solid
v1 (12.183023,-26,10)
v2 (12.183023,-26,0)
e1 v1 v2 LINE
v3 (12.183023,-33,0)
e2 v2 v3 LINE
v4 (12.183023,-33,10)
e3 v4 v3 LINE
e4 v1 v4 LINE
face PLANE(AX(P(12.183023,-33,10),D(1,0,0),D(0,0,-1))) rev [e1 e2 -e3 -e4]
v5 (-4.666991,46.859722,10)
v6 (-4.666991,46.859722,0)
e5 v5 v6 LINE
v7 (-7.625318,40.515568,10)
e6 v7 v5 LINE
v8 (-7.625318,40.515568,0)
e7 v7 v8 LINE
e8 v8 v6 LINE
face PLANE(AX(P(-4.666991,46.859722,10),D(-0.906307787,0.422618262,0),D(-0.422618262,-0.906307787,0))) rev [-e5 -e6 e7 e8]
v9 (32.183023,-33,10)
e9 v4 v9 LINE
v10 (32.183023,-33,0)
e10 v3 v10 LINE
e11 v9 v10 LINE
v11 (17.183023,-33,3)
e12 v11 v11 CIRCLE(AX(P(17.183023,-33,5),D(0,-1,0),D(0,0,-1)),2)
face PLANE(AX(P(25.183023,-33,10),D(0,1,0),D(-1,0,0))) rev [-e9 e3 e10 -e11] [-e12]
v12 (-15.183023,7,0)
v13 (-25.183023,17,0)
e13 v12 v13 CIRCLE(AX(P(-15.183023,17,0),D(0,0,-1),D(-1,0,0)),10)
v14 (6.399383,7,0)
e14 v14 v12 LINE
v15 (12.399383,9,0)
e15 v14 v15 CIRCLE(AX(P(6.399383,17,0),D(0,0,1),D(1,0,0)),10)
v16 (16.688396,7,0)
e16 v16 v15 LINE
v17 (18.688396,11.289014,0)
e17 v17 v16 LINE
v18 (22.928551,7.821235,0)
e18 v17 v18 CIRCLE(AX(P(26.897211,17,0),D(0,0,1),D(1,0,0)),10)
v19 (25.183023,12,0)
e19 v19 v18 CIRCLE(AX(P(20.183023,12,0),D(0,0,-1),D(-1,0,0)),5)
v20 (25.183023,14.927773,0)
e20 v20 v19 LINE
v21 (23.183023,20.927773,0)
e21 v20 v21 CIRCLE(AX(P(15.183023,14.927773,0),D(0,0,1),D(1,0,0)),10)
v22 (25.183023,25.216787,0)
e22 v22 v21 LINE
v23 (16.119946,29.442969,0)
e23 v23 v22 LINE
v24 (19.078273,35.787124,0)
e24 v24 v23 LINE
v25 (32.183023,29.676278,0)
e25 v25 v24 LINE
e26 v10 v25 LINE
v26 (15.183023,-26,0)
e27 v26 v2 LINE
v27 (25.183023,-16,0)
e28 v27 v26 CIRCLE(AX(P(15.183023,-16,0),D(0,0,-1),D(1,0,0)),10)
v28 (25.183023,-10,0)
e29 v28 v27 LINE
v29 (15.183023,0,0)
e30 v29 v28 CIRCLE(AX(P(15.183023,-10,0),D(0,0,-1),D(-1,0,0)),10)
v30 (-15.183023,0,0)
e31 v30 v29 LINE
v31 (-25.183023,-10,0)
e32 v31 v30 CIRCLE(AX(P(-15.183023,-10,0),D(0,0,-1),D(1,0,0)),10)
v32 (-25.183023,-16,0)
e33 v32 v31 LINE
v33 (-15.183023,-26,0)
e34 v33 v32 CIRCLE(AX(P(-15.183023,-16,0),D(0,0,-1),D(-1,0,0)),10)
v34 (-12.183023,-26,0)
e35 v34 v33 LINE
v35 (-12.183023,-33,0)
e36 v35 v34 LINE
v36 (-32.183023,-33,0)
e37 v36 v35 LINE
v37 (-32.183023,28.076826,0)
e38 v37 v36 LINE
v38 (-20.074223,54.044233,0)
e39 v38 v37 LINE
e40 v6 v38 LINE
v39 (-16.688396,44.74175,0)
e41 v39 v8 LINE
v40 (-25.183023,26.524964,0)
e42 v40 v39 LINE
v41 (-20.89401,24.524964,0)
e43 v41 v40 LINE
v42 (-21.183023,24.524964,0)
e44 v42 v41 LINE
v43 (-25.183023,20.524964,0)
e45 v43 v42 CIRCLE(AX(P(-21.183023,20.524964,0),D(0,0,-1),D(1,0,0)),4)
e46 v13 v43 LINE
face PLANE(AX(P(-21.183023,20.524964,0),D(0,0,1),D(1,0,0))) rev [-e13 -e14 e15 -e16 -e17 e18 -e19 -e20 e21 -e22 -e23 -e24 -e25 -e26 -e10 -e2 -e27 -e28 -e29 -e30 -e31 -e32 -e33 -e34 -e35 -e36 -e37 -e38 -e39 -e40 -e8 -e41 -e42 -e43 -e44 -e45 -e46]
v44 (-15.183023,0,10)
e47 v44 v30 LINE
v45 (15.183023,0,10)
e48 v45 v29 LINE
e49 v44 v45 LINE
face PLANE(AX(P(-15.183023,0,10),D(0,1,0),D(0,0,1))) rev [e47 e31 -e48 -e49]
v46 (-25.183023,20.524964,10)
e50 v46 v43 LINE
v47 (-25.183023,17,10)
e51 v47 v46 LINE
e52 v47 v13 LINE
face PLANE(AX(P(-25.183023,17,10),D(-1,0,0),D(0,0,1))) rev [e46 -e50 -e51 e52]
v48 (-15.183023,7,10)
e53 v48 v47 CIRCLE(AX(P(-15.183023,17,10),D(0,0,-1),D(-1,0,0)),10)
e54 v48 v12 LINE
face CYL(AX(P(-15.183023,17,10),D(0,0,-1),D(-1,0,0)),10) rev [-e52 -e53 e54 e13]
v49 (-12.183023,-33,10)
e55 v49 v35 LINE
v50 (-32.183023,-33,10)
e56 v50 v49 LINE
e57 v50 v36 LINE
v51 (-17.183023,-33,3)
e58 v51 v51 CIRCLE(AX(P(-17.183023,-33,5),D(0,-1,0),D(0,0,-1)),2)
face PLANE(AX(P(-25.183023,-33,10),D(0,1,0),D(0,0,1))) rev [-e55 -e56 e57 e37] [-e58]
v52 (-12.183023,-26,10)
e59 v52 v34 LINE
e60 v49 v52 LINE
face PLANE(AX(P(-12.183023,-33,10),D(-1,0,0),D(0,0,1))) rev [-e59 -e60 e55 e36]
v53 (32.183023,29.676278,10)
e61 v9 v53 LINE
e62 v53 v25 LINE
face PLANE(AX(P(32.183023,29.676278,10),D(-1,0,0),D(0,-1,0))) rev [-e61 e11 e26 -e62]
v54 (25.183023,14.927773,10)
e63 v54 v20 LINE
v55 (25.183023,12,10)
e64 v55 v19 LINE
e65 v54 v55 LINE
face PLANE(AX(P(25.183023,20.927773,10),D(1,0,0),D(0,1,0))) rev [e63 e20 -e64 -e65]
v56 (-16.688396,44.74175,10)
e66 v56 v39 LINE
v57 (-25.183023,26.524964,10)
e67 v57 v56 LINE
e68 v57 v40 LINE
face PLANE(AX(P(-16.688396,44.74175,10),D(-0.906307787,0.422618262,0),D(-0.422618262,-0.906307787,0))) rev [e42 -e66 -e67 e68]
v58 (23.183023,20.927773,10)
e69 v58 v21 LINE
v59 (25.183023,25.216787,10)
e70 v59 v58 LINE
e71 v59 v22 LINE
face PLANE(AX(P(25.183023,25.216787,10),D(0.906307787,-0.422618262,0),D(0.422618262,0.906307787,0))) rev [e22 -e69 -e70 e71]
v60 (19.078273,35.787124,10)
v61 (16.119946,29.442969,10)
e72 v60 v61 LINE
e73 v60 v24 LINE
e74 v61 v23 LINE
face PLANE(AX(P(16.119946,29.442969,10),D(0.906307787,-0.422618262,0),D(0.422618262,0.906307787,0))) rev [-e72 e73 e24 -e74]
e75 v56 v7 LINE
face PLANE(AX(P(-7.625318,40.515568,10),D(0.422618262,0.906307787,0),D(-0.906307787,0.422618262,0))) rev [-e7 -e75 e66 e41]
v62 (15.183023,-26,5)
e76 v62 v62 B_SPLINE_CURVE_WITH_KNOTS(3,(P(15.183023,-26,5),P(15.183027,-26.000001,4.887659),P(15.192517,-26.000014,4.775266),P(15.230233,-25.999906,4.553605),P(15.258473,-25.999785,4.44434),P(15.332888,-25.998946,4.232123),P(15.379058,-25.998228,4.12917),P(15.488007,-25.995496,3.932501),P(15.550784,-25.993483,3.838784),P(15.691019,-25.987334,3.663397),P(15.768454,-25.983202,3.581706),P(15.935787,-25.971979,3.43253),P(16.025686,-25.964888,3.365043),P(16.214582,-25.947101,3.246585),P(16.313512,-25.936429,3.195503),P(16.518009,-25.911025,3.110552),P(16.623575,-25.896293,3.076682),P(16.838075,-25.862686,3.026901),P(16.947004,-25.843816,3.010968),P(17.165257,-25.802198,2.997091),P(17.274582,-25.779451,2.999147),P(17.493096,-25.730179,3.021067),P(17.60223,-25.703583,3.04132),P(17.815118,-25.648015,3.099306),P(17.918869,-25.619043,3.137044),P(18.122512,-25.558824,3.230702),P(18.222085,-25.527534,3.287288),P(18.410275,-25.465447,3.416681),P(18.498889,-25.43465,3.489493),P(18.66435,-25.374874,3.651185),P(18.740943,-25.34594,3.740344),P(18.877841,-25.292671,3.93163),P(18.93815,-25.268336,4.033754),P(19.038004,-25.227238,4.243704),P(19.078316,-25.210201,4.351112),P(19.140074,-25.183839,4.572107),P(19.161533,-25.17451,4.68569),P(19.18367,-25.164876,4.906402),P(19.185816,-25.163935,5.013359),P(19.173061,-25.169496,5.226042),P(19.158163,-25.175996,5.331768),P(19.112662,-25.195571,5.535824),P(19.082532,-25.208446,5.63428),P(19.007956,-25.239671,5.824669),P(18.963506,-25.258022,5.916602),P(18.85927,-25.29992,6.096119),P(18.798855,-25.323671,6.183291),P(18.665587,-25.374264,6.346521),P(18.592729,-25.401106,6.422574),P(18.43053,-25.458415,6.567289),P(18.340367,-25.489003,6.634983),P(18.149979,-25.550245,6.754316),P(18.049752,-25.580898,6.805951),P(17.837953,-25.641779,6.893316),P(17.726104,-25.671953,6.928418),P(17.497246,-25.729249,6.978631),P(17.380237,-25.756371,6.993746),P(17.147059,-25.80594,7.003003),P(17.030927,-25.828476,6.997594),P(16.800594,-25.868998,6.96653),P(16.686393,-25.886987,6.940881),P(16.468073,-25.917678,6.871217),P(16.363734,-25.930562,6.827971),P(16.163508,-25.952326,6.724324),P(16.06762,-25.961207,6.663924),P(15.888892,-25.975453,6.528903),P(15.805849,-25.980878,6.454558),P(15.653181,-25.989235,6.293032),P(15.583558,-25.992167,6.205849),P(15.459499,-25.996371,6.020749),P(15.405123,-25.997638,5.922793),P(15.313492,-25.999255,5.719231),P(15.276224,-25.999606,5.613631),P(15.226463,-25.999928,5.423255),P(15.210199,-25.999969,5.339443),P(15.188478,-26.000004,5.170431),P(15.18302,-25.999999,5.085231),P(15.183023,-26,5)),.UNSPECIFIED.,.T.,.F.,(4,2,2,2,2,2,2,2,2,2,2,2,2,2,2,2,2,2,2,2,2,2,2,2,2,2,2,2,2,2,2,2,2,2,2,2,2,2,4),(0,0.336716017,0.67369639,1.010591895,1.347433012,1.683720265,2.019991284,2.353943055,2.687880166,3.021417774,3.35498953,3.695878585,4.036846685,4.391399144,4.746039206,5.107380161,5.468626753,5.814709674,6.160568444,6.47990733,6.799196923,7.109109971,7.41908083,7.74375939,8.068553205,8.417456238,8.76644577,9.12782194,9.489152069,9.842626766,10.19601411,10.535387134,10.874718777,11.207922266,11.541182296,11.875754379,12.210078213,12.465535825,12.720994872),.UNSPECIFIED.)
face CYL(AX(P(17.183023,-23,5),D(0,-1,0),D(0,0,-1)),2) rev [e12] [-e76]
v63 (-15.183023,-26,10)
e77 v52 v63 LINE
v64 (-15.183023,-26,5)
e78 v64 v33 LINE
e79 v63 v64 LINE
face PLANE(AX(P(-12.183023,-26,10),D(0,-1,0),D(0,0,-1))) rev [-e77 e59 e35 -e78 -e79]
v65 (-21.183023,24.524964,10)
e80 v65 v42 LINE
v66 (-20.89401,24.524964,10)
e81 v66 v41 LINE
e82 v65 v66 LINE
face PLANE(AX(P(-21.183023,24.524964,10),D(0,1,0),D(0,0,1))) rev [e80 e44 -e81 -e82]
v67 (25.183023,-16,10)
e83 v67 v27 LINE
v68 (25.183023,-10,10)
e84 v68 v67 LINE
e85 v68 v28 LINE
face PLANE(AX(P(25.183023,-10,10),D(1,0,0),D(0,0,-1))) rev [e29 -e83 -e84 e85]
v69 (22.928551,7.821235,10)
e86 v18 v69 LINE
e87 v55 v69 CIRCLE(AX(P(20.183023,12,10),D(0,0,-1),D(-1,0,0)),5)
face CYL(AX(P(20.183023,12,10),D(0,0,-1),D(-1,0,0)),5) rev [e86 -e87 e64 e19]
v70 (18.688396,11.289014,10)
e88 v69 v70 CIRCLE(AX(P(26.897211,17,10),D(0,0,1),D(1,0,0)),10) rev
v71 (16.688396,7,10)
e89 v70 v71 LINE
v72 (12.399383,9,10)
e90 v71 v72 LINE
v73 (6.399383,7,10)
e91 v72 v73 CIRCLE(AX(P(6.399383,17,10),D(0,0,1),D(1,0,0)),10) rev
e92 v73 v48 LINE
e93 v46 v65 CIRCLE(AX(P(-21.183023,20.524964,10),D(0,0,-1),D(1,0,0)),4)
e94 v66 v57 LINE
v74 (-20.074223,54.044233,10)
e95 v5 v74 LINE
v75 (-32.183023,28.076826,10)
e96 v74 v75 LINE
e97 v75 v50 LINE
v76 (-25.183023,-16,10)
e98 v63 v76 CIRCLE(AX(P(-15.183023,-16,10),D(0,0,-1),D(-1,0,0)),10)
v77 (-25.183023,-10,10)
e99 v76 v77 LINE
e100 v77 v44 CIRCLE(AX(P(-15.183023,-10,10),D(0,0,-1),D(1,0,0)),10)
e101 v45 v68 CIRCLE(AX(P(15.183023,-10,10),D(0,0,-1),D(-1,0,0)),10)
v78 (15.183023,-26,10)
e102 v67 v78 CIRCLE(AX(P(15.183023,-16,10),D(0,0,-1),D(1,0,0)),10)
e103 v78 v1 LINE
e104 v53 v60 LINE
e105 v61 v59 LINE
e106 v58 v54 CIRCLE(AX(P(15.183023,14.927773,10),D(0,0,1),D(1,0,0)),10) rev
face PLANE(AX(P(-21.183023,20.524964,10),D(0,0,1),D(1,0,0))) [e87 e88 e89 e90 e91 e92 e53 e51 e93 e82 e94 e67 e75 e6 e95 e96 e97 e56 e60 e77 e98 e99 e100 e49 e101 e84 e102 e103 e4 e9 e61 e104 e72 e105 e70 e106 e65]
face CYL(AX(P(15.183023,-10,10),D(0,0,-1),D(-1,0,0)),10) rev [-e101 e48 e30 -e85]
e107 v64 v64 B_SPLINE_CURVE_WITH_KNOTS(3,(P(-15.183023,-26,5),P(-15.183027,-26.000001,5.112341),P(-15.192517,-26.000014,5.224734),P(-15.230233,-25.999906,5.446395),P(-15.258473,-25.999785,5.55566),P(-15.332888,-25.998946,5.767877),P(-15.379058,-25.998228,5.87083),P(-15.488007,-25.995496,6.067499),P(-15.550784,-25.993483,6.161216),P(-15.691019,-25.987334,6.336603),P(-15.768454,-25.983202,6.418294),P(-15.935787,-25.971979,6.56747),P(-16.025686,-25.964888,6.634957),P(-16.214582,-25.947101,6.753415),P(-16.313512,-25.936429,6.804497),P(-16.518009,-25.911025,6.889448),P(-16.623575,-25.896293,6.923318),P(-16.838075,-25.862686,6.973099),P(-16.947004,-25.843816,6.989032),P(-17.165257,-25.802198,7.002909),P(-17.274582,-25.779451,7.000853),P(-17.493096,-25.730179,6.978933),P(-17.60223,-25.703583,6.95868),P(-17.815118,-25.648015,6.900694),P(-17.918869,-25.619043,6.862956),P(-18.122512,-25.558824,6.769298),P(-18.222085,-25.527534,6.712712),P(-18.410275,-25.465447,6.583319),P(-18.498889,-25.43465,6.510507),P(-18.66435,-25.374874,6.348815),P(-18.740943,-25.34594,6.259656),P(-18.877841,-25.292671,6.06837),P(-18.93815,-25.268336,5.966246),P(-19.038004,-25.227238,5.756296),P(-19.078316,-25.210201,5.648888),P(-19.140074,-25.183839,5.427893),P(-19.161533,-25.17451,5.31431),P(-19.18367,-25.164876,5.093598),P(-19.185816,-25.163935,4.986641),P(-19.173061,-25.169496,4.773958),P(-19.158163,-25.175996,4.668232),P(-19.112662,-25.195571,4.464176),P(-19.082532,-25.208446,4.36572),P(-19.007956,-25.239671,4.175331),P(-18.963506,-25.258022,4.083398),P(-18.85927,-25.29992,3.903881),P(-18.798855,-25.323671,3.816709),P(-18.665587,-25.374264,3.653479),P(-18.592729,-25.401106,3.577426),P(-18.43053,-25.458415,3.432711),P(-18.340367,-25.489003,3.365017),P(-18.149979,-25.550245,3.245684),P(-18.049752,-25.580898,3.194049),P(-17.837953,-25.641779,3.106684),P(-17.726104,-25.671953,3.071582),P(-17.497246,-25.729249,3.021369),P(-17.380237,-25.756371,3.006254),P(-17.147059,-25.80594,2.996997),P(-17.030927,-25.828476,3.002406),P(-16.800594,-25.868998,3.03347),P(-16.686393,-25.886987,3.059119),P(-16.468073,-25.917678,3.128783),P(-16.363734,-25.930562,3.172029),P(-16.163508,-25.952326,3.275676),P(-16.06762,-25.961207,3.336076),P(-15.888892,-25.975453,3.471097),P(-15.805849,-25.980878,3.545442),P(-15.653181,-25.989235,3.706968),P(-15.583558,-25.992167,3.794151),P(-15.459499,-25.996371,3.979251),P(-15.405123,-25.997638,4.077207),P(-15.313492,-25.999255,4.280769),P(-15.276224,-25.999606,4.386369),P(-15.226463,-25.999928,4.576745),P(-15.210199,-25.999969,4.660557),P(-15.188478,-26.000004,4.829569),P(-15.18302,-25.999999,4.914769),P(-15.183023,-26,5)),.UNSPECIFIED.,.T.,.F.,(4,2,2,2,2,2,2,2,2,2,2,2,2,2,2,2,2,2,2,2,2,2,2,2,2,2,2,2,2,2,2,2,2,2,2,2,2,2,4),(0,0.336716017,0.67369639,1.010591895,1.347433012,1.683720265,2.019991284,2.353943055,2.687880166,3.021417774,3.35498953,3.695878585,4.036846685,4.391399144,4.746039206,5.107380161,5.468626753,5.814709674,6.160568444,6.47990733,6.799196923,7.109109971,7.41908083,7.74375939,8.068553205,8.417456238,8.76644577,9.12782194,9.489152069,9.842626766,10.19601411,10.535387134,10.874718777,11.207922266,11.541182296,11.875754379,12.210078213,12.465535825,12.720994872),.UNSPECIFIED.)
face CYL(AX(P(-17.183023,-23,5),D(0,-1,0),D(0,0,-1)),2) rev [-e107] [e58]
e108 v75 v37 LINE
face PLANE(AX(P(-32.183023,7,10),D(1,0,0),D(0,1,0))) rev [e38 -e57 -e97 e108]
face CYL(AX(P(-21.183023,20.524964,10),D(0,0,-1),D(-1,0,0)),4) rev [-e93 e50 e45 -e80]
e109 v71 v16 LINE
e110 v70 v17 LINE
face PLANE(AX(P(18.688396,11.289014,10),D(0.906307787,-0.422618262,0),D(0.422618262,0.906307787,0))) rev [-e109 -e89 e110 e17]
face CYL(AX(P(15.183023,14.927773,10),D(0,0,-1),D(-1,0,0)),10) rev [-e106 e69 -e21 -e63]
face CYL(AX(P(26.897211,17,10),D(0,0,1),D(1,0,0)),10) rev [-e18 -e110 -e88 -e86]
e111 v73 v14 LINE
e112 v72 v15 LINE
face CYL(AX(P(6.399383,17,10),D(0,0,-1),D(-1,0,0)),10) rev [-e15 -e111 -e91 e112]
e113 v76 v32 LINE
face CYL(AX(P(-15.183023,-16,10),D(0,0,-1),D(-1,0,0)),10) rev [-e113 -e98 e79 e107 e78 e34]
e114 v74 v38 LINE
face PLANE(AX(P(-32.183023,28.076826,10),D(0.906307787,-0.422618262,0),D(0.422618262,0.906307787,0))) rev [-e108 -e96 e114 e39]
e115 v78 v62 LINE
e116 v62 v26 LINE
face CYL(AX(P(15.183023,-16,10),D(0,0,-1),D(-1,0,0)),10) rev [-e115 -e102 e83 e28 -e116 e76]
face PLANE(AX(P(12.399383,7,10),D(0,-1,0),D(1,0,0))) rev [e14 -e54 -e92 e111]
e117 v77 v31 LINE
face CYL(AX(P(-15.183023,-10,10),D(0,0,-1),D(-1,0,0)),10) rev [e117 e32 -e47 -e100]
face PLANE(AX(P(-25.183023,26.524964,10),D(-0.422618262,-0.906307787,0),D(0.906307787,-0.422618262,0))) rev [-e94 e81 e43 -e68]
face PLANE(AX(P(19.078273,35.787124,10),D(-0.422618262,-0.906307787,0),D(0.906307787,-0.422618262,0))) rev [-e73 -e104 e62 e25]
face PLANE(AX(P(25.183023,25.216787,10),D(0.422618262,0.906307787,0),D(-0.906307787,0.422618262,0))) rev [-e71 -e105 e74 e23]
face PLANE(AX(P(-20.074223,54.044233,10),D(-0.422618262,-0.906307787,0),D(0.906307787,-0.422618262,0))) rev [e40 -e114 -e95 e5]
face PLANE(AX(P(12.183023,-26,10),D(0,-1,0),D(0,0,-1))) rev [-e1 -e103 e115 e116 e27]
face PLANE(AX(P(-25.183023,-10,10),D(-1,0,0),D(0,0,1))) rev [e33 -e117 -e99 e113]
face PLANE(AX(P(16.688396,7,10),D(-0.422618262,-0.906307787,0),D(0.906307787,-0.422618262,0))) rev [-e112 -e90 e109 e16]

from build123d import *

# Parameters (mm, degrees)
SALIENTE_EXTRUIR1_DEPTH = 10
REDONDEO1_R             = 10
REDONDEO2_R             = 10
CROQUIS2_R              = 2
CORTAR_EXTRUIR1_DEPTH   = 10


with BuildPart() as part:
    # Croquis1 → Saliente-Extruir1 (new body)
    with BuildSketch(Plane.XY):
        with BuildLine():
            Line((-15.183023411, 0), (15.183023411, 0))
            ThreePointArc((15.183023411, 0), (22.254091223, -2.928932188), (25.183023411, -10))
            Line((25.183023411, -10), (25.183023411, -16))
            ThreePointArc((25.183023411, -16), (22.254091223, -23.071067812), (15.183023411, -26))
            Line((15.183023411, -26), (12.183023411, -26))
            Line((12.183023411, -26), (12.183023411, -33))
            Line((12.183023411, -33), (25.183023411, -33))
            Line((25.183023411, -33), (32.183023411, -33))
            Line((32.183023411, -33), (32.183023411, 7))
            Line((32.183023411, 7), (32.183023411, 29.676278345))
            Line((32.183023411, 29.676278345), (19.078273373, 35.787123646))
            Line((19.078273373, 35.787123646), (16.119945541, 29.442969137))
            Line((16.119945541, 29.442969137), (25.183023411, 25.216786519))
            Line((25.183023411, 25.216786519), (23.183023411, 20.927772678))
            Line((23.183023411, 20.927772678), (25.183023411, 20.927772678))
            Line((25.183023411, 20.927772678), (25.183023411, 12))
            ThreePointArc((25.183023411, 12), (23.718557317, 8.464466094), (20.183023411, 7))
            Line((20.183023411, 7), (18.68839635, 7))
            Line((18.68839635, 7), (18.68839635, 11.289013841))
            Line((18.68839635, 11.289013841), (16.68839635, 7))
            Line((16.68839635, 7), (12.399382509, 9))
            Line((12.399382509, 9), (12.399382509, 7))
            Line((12.399382509, 7), (-15.183023411, 7))
            ThreePointArc((-15.183023411, 7), (-22.254091223, 9.928932188), (-25.183023411, 17))
            Line((-25.183023411, 17), (-25.183023411, 20.524963692))
            ThreePointArc((-25.183023411, 20.524963692), (-24.011450536, 23.353390817), (-21.183023411, 24.524963692))
            Line((-21.183023411, 24.524963692), (-20.89400957, 24.524963692))
            Line((-20.89400957, 24.524963692), (-25.183023411, 26.524963692))
            Line((-25.183023411, 26.524963692), (-16.68839635, 44.741750212))
            Line((-16.68839635, 44.741750212), (-7.62531848, 40.515567594))
            Line((-7.62531848, 40.515567594), (-4.666990648, 46.859722104))
            Line((-4.666990648, 46.859722104), (-20.074223027, 54.044232553))
            Line((-20.074223027, 54.044232553), (-32.183023411, 28.076826331))
            Line((-32.183023411, 28.076826331), (-32.183023411, 7))
            Line((-32.183023411, 7), (-32.183023411, -33))
            Line((-32.183023411, -33), (-25.183023411, -33))
            Line((-25.183023411, -33), (-12.183023411, -33))
            Line((-12.183023411, -33), (-12.183023411, -26))
            Line((-12.183023411, -26), (-15.183023411, -26))
            ThreePointArc((-15.183023411, -26), (-22.254091223, -23.071067812), (-25.183023411, -16))
            Line((-25.183023411, -16), (-25.183023411, -10))
            ThreePointArc((-25.183023411, -10), (-22.254091223, -2.928932188), (-15.183023411, 0))
        make_face()
    extrude(amount=SALIENTE_EXTRUIR1_DEPTH)

    # Redondeo1
    # the kernel refuses this fillet: 10 mm, written as the material it adds along each edge
    with BuildSketch(Plane(origin=(18.68839635, 7, 0), x_dir=(0, 1, 0), z_dir=(0, 0, 1))) as redondeo1_piece_1_section:
        with BuildLine():
            CenterArc((10, -8.208814597), REDONDEO1_R, 124.826871163, 55.173128837)
            Line((0, -8.208814597), (-0.2, -8.208814597))
            Line((-0.2, -8.208814597), (-0.2, 0))
            Line((-0.2, 0), (0, 0.2))
            ThreePointArc((0, 0.2), (2.144506921, 0.2), (4.174794118, 0.164176292))
            Line((4.174794118, 0.164176292), (4.289013841, 0))
        make_face()
    redondeo1_piece_1 = extrude(amount=10, mode=Mode.PRIVATE)
    redondeo1_piece_1 = split(redondeo1_piece_1, bisect_by=Plane(origin=(17.840933122, 9.471623083, 5), z_dir=(0.9063077870366527, -0.4226182617406938, 0)), keep=Keep.TOP, mode=Mode.PRIVATE)
    add(redondeo1_piece_1)
    with BuildSketch(Plane(origin=(12.399382509, 7, 0), x_dir=(-1, 0, 0), z_dir=(0, 0, 1))) as redondeo1_piece_2:
        with BuildLine():
            CenterArc((6, -10), REDONDEO1_R, 90, 36.869897646)
            Line((0, -2), (-0.12, -1.84))
            ThreePointArc((-0.12, -1.84), (-0.2, -1), (-0.2, 0))
            Line((-0.2, 0), (0, 0.2))
            Line((0, 0.2), (6, 0.2))
            Line((6, 0.2), (6, 0))
        make_face()
    extrude(amount=10)

    # Redondeo2
    # the kernel refuses this fillet: 10 mm, written as the material it adds along each edge
    with BuildSketch(Plane(origin=(25.183023411, 20.927772678, 0), x_dir=(-1, 0, 0), z_dir=(0, 0, 1))) as redondeo2_piece_1:
        with BuildLine():
            CenterArc((10, 6), REDONDEO2_R, 180, 36.869897646)
            Line((0, 6), (-0.2, 6))
            Line((-0.2, 6), (-0.2, 0))
            Line((-0.2, 0), (0, -0.2))
            ThreePointArc((0, -0.2), (1, -0.2), (1.84, -0.12))
            Line((1.84, -0.12), (2, 0))
        make_face()
    extrude(amount=10)

    # Croquis2 → Cortar-Extruir1 (cut)
    with BuildSketch(Plane.XZ.offset(33)):
        with Locations(Location((-17.183023411, 5, 0), (0, 0, 270))):
            Circle(CROQUIS2_R)
        with Locations(Location((17.183023411, 5, 0), (0, 0, 270))):
            Circle(CROQUIS2_R)
    extrude(amount=-CORTAR_EXTRUIR1_DEPTH, mode=Mode.SUBTRACT)


solid = part.part
